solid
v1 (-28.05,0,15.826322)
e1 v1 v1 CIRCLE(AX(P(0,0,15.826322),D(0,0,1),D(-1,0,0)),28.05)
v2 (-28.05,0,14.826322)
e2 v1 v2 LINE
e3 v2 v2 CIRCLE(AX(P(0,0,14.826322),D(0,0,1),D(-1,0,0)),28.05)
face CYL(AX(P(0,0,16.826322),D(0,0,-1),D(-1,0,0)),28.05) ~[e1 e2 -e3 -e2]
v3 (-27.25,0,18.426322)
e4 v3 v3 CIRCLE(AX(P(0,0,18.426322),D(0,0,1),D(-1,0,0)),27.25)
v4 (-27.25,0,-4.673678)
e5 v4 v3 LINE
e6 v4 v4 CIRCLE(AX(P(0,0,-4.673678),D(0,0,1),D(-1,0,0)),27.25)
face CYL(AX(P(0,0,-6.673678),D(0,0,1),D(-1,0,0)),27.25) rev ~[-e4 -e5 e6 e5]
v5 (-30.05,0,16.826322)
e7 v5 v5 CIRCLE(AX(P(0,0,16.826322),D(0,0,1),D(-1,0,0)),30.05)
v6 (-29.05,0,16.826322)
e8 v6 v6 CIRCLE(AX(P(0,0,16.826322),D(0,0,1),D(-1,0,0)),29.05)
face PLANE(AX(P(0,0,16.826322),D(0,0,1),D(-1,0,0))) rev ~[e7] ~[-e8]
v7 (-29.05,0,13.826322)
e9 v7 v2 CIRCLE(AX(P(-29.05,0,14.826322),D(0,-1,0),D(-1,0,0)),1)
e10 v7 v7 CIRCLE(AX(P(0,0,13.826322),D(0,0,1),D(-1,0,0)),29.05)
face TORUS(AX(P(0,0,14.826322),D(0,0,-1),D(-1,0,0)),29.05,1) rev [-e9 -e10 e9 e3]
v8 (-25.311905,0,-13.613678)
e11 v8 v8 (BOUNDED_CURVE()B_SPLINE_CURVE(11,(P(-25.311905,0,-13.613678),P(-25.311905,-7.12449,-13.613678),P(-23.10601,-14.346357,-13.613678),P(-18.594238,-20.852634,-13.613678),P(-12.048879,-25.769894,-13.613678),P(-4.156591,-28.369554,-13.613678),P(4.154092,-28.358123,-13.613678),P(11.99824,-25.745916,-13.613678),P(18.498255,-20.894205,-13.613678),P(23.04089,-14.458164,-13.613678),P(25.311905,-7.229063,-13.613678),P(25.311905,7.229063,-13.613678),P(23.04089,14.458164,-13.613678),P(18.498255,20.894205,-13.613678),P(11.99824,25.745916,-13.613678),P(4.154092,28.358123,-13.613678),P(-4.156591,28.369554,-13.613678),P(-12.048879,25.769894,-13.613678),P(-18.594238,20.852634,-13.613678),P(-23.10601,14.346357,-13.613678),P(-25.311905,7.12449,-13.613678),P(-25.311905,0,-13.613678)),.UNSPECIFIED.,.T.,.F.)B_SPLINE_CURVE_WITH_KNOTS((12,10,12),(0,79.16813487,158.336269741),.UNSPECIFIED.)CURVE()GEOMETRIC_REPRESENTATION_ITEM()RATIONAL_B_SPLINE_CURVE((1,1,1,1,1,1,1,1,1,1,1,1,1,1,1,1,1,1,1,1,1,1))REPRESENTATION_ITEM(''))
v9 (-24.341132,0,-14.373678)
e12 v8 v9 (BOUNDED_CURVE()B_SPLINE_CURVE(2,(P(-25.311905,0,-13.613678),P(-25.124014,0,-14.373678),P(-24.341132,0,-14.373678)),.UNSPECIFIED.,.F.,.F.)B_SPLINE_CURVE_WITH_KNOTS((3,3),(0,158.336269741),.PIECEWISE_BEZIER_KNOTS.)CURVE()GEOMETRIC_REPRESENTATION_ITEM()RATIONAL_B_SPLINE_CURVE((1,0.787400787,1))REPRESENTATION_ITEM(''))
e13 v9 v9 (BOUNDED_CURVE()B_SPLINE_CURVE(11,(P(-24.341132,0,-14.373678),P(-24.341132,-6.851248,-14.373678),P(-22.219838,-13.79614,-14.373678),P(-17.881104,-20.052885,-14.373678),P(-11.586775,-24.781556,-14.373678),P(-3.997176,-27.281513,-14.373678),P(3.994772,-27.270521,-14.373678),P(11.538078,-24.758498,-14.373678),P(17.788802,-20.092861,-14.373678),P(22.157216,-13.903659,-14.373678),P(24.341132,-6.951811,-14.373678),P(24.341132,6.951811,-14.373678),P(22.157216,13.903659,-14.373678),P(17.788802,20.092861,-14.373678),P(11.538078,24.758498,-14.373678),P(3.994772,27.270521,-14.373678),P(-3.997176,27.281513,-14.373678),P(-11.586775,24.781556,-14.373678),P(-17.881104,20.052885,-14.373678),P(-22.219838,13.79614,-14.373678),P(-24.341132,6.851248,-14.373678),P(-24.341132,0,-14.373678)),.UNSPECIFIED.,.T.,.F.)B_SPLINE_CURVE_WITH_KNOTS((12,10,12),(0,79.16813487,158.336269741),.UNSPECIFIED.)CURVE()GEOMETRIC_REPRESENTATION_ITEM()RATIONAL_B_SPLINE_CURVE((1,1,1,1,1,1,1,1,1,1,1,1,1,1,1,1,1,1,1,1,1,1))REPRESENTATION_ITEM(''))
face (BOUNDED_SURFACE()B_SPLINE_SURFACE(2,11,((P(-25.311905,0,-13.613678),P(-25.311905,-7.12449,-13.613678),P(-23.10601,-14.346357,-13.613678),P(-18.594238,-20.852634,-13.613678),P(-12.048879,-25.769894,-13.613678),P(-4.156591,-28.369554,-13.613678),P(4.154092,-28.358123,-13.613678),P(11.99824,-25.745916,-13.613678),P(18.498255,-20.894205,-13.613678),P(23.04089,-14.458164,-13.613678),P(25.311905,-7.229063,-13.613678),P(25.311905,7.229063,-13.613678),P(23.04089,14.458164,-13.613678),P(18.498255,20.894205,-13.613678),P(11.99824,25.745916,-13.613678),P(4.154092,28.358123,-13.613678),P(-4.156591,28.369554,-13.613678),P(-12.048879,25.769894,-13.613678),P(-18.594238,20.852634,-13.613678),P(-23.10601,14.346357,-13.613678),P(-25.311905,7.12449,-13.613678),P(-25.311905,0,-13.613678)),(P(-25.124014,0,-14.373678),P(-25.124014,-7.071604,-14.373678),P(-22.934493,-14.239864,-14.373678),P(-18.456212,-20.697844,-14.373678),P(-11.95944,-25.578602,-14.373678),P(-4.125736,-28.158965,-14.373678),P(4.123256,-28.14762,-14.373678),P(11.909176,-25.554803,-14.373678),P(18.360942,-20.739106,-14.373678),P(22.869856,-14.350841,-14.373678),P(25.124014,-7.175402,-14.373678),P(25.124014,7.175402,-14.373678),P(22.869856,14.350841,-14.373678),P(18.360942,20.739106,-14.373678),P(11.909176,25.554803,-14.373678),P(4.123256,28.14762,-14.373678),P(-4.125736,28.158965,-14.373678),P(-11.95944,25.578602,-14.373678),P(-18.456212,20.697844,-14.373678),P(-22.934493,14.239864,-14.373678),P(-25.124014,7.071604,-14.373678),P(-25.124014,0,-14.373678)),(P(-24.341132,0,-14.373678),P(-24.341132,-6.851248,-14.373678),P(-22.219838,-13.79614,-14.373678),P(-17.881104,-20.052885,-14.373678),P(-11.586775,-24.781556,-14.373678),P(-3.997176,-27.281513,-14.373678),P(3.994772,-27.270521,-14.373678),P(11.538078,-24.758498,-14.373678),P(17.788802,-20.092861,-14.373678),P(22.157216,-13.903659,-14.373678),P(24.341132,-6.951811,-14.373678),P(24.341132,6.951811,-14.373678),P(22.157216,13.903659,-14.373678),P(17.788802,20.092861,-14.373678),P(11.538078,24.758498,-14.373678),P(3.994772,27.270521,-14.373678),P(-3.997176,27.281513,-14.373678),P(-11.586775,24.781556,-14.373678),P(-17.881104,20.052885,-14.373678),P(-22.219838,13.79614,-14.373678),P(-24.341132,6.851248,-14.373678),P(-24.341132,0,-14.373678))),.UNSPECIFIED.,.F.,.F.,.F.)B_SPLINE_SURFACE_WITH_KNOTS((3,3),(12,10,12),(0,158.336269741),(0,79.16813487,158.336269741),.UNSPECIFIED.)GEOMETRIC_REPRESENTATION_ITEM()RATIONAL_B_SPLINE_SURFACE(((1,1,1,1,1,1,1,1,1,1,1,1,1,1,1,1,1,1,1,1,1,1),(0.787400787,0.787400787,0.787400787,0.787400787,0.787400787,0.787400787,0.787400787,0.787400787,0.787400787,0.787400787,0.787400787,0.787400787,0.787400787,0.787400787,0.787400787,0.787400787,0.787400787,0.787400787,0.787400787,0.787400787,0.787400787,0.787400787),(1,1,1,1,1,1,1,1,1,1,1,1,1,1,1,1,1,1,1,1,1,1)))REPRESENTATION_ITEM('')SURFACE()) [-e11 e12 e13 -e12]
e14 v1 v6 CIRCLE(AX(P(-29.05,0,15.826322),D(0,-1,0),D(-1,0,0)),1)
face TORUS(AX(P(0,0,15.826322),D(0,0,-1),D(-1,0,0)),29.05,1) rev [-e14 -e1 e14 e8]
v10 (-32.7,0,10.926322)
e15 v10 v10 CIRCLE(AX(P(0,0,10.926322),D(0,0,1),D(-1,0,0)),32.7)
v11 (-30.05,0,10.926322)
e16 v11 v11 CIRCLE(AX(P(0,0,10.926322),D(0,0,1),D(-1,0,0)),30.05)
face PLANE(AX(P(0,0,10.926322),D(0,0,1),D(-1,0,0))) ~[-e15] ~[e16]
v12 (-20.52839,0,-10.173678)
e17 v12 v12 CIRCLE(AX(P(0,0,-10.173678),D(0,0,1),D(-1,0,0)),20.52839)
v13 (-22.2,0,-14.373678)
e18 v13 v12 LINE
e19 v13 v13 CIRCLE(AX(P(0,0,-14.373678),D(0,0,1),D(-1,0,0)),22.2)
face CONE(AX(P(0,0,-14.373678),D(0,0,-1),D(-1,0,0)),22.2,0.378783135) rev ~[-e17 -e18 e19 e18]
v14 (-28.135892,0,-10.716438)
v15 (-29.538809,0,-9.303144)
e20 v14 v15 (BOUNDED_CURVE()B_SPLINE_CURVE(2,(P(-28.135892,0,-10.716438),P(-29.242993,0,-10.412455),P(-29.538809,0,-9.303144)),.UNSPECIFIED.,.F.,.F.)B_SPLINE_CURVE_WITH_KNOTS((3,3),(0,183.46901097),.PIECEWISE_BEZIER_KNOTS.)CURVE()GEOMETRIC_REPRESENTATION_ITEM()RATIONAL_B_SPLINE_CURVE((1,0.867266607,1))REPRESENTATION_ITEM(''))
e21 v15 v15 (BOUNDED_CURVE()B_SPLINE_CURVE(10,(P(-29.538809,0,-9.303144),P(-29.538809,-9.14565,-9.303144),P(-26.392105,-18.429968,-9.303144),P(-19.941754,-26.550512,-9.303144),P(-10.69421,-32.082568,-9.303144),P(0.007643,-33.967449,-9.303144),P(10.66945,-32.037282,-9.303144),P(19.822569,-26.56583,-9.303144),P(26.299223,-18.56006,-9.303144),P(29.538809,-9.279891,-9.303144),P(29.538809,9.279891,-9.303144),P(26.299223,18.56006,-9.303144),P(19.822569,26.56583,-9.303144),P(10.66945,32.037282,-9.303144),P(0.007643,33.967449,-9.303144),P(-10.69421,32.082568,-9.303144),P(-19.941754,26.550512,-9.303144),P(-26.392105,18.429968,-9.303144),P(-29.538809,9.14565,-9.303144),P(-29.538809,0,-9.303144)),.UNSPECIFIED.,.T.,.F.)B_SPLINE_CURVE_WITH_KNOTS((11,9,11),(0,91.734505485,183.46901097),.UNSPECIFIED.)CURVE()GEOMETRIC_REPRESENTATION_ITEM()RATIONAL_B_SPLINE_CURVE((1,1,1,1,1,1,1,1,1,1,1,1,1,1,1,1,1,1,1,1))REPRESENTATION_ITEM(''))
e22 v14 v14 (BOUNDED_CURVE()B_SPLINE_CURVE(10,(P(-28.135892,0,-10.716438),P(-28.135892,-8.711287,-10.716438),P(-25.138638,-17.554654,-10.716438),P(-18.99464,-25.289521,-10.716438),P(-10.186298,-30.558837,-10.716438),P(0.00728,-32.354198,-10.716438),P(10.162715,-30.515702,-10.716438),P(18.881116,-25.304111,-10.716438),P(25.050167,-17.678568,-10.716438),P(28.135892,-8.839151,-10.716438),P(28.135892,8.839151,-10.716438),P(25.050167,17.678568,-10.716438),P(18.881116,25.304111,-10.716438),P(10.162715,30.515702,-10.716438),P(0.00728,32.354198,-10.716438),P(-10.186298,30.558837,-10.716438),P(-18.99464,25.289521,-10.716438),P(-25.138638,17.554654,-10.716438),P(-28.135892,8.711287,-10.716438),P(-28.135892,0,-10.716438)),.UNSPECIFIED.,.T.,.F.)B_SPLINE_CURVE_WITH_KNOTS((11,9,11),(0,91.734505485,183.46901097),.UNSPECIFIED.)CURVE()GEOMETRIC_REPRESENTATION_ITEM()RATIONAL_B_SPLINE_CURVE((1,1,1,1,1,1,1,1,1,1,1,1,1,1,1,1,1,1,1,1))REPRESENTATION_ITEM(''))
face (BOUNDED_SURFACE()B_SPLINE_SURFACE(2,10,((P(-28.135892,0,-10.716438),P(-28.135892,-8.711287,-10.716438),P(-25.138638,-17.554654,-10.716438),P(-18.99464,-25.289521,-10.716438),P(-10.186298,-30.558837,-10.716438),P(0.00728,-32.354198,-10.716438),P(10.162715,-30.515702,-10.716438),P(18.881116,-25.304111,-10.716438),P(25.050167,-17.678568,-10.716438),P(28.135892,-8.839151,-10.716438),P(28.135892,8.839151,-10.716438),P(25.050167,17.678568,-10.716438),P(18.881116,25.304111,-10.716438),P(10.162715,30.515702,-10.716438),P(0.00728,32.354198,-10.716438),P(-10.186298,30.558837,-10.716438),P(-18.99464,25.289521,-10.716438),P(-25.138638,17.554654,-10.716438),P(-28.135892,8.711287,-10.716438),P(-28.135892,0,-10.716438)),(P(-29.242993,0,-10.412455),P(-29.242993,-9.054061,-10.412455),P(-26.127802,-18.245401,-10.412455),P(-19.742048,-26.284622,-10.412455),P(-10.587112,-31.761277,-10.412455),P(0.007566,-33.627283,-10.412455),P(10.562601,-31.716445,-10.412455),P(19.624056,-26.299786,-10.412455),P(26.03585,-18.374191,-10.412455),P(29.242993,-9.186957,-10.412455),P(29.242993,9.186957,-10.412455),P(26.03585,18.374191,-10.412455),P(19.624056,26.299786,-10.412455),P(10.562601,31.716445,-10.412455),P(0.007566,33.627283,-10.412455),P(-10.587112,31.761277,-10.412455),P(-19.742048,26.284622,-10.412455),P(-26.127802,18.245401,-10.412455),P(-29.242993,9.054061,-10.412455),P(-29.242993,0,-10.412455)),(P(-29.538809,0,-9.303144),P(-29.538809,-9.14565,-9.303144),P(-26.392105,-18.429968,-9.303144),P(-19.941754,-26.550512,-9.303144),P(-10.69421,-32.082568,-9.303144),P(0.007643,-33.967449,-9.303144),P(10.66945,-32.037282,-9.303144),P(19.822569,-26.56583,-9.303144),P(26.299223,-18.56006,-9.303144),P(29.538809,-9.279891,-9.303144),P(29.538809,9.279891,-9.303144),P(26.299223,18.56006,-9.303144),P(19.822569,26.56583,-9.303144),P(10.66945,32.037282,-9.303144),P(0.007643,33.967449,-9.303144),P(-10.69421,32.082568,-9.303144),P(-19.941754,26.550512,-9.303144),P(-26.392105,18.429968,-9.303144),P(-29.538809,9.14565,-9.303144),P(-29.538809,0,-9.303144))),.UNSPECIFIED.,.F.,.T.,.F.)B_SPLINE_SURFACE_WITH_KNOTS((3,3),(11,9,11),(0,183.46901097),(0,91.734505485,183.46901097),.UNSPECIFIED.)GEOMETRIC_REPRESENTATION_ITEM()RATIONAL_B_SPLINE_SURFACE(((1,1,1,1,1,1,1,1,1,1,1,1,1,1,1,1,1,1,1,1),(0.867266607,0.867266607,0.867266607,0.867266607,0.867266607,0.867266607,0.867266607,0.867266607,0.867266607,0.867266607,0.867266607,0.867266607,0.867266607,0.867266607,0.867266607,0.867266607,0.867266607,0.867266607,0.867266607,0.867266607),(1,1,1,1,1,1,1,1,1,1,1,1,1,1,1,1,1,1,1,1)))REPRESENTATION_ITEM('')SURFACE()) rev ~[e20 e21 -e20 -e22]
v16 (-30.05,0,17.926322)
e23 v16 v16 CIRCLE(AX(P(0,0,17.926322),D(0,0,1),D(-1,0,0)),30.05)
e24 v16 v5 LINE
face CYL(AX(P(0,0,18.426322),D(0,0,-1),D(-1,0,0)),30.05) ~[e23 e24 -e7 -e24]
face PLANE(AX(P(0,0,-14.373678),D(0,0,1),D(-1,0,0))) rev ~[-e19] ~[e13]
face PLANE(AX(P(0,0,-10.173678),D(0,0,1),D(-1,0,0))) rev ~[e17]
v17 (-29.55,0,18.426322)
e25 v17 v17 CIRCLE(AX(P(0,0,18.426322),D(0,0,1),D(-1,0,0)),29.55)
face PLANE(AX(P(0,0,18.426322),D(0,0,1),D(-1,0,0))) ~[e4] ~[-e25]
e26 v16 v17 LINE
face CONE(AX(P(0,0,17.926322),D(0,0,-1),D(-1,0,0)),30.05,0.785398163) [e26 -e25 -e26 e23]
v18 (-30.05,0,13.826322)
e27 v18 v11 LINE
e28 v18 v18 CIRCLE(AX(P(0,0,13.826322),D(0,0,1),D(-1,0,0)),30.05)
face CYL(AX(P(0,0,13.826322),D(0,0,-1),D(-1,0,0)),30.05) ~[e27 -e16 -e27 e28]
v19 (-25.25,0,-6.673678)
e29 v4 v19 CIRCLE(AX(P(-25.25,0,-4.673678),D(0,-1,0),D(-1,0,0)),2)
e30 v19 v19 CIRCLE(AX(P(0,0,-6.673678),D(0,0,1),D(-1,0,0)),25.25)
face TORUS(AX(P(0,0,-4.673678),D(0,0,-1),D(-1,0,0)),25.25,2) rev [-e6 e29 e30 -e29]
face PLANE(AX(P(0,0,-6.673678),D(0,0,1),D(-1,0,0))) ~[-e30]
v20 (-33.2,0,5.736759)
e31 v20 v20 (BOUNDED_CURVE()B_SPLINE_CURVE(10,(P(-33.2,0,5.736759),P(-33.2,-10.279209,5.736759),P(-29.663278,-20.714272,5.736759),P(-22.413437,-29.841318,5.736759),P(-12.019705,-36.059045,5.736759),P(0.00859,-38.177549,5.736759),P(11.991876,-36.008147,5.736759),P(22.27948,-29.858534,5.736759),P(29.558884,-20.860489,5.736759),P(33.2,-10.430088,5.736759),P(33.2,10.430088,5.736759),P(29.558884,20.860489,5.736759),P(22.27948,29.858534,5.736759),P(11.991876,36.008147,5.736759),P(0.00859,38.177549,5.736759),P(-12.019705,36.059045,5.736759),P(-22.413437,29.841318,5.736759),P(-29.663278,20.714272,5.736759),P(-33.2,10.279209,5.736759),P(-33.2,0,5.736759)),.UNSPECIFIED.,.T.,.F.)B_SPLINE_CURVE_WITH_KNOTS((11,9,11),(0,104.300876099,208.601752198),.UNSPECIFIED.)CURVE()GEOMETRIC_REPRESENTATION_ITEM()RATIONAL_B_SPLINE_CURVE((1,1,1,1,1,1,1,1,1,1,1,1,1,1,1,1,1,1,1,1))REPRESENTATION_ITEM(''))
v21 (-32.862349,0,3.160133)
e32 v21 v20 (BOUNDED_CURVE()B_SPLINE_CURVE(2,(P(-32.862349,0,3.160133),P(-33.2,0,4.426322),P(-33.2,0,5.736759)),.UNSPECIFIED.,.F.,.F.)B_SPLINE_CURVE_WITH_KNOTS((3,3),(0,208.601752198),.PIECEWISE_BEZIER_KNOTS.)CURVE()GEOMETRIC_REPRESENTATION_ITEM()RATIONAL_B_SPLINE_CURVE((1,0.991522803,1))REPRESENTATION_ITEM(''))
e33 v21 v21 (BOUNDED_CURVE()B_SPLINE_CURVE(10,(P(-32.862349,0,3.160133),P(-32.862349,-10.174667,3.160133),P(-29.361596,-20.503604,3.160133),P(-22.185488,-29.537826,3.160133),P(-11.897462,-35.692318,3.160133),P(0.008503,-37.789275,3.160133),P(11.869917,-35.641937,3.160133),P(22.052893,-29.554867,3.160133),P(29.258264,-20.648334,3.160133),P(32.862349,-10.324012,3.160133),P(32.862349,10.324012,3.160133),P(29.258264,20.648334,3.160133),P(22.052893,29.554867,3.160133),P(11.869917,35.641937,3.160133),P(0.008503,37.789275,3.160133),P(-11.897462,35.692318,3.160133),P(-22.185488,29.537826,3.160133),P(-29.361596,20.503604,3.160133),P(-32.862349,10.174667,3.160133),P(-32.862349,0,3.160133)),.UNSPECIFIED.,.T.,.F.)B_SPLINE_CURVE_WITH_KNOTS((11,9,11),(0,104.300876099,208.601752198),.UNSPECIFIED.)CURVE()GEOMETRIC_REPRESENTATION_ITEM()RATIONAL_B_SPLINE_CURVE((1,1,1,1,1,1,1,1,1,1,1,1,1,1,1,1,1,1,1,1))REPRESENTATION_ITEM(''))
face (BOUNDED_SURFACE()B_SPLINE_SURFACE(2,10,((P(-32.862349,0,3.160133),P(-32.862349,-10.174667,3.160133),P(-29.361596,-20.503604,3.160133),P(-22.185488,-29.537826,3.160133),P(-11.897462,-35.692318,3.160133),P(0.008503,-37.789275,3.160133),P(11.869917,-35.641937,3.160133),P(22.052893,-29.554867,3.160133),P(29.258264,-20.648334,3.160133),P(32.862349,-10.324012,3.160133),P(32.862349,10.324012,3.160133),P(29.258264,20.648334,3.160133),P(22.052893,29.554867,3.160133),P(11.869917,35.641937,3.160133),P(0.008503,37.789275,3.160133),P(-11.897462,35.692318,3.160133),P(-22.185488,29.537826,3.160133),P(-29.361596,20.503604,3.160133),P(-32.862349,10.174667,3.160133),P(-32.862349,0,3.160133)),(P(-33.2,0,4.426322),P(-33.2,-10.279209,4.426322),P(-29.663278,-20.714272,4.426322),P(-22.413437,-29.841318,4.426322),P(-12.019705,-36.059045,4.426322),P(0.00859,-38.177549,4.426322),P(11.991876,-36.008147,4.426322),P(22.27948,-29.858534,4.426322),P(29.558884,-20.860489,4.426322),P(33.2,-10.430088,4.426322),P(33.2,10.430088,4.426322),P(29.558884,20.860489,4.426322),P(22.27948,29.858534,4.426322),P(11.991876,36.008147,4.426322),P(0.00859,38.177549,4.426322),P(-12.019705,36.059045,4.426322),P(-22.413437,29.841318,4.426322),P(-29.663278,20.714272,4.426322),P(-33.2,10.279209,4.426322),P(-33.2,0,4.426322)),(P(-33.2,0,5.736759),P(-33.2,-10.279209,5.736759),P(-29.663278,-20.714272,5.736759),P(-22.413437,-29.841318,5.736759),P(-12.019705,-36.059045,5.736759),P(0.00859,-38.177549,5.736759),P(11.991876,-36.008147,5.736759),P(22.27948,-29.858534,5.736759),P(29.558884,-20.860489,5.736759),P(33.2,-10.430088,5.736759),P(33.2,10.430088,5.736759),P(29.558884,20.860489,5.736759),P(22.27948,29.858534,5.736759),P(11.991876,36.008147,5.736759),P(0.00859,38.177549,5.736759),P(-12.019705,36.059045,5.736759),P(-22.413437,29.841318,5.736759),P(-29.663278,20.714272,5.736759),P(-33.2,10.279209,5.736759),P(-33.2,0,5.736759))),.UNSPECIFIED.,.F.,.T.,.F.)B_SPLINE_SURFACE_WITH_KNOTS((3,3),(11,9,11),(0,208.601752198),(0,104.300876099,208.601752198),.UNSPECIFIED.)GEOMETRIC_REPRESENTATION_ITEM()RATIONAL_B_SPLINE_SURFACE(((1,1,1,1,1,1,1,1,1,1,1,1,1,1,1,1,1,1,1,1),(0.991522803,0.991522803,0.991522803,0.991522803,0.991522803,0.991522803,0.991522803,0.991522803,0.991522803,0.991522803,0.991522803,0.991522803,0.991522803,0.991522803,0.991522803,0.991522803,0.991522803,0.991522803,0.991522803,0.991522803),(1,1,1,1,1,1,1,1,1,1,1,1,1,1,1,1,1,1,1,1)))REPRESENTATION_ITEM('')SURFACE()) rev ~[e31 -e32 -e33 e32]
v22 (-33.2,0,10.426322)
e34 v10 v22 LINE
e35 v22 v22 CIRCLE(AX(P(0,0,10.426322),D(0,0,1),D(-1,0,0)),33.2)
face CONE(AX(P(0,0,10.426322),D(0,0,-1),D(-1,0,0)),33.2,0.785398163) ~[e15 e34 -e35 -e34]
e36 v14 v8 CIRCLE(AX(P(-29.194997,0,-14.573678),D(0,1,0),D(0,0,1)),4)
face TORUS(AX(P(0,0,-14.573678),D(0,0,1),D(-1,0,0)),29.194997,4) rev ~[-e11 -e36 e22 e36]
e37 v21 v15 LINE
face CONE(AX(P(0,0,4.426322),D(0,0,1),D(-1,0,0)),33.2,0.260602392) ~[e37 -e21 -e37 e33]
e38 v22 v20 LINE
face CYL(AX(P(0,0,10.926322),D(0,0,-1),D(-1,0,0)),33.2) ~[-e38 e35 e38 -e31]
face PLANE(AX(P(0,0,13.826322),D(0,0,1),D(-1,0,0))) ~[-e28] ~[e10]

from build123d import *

# Parameters (mm, degrees)
F3_R    = 2
F4_R    = 1
F5_R    = 2
F8_R    = 10
F6_SIZE = 0.5
F9_SIZE = 0.5
F7_R    = 1


# Not quite as in the source:
# - a fillet or chamfer that OpenCascade refuses, or shapes differently, is made with other operations: its cross-section is extruded or revolved along the edge and cut away or added


with BuildPart() as f1:
    # F0 (on Front) → F1 (revolve)
    with BuildSketch(Plane.XZ):
        Polygon((0, -6.6736775178), (-27.25, -6.6736775178), (-27.25, 18.4263224822), (-30.05, 18.4263224822), (-30.05, 16.8263224822), (-28.05, 16.8263224822), (-28.05, 13.8263224822), (-30.05, 13.8263224822), (-30.05, 10.9263224822), (-33.2, 10.9263224822), (-33.2, 4.4263224822), (-29.2, -10.5736775178), (-25.2, -10.5736775178), (-25.2, -14.3736775178), (-22.2, -14.3736775178), (-20.5283898626, -10.1736775178), (0, -10.1736775178), align=None)
    revolve(axis=Axis((0, 0, -8.4236775178), (0, 0, 1)))

    # F2: fillet of radius 4 on 1 edges, made by hand

    # F2_s1 → F2_t2 (revolve)
    with BuildSketch(Plane.XZ):
        with BuildLine():
            ThreePointArc((-29.1949968711, -10.5736775178), (-26.4381871207, -11.6754021686), (-25.2, -14.3736775178))
            Line((-25.2, -14.3736775178), (-25.2, -10.5736775178))
            Line((-25.2, -10.5736775178), (-29.1949968711, -10.5736775178))
        make_face()
    revolve(axis=Axis((0, 0, -10.5736775178), (0, 0, 1)))

    # F3
    f3_edges = [f1.edges().sort_by_distance(p)[0] for p in [
        (27.25, 0, -6.673678),
    ]]
    fillet(f3_edges, radius=F3_R)

    # F4
    f4_edges = [f1.edges().sort_by_distance(p)[0] for p in [
        (25.2, 0, -14.373678),
    ]]
    fillet(f4_edges, radius=F4_R)

    # F5
    f5_edges = [f1.edges().sort_by_distance(p)[0] for p in [
        (29.2, 0, -10.573678),
    ]]
    fillet(f5_edges, radius=F5_R)

    # F8
    f8_edges = [f1.edges().sort_by_distance(p)[0] for p in [
        (33.2, 0, 4.426322),
    ]]
    fillet(f8_edges, radius=F8_R)

    # F6
    f6_edges = [f1.edges().sort_by_distance(p)[0] for p in [
        (30.05, 0, 18.426322),
    ]]
    chamfer(f6_edges, length=F6_SIZE)

    # F9
    f9_edges = [f1.edges().sort_by_distance(p)[0] for p in [
        (33.2, 0, 10.926322),
    ]]
    chamfer(f9_edges, length=F9_SIZE)

    # F7
    f7_edges = [f1.edges().sort_by_distance(p)[0] for p in [
        (28.05, 0, 16.826322),
        (28.05, 0, 13.826322),
    ]]
    fillet(f7_edges, radius=F7_R)


solid = f1.part
